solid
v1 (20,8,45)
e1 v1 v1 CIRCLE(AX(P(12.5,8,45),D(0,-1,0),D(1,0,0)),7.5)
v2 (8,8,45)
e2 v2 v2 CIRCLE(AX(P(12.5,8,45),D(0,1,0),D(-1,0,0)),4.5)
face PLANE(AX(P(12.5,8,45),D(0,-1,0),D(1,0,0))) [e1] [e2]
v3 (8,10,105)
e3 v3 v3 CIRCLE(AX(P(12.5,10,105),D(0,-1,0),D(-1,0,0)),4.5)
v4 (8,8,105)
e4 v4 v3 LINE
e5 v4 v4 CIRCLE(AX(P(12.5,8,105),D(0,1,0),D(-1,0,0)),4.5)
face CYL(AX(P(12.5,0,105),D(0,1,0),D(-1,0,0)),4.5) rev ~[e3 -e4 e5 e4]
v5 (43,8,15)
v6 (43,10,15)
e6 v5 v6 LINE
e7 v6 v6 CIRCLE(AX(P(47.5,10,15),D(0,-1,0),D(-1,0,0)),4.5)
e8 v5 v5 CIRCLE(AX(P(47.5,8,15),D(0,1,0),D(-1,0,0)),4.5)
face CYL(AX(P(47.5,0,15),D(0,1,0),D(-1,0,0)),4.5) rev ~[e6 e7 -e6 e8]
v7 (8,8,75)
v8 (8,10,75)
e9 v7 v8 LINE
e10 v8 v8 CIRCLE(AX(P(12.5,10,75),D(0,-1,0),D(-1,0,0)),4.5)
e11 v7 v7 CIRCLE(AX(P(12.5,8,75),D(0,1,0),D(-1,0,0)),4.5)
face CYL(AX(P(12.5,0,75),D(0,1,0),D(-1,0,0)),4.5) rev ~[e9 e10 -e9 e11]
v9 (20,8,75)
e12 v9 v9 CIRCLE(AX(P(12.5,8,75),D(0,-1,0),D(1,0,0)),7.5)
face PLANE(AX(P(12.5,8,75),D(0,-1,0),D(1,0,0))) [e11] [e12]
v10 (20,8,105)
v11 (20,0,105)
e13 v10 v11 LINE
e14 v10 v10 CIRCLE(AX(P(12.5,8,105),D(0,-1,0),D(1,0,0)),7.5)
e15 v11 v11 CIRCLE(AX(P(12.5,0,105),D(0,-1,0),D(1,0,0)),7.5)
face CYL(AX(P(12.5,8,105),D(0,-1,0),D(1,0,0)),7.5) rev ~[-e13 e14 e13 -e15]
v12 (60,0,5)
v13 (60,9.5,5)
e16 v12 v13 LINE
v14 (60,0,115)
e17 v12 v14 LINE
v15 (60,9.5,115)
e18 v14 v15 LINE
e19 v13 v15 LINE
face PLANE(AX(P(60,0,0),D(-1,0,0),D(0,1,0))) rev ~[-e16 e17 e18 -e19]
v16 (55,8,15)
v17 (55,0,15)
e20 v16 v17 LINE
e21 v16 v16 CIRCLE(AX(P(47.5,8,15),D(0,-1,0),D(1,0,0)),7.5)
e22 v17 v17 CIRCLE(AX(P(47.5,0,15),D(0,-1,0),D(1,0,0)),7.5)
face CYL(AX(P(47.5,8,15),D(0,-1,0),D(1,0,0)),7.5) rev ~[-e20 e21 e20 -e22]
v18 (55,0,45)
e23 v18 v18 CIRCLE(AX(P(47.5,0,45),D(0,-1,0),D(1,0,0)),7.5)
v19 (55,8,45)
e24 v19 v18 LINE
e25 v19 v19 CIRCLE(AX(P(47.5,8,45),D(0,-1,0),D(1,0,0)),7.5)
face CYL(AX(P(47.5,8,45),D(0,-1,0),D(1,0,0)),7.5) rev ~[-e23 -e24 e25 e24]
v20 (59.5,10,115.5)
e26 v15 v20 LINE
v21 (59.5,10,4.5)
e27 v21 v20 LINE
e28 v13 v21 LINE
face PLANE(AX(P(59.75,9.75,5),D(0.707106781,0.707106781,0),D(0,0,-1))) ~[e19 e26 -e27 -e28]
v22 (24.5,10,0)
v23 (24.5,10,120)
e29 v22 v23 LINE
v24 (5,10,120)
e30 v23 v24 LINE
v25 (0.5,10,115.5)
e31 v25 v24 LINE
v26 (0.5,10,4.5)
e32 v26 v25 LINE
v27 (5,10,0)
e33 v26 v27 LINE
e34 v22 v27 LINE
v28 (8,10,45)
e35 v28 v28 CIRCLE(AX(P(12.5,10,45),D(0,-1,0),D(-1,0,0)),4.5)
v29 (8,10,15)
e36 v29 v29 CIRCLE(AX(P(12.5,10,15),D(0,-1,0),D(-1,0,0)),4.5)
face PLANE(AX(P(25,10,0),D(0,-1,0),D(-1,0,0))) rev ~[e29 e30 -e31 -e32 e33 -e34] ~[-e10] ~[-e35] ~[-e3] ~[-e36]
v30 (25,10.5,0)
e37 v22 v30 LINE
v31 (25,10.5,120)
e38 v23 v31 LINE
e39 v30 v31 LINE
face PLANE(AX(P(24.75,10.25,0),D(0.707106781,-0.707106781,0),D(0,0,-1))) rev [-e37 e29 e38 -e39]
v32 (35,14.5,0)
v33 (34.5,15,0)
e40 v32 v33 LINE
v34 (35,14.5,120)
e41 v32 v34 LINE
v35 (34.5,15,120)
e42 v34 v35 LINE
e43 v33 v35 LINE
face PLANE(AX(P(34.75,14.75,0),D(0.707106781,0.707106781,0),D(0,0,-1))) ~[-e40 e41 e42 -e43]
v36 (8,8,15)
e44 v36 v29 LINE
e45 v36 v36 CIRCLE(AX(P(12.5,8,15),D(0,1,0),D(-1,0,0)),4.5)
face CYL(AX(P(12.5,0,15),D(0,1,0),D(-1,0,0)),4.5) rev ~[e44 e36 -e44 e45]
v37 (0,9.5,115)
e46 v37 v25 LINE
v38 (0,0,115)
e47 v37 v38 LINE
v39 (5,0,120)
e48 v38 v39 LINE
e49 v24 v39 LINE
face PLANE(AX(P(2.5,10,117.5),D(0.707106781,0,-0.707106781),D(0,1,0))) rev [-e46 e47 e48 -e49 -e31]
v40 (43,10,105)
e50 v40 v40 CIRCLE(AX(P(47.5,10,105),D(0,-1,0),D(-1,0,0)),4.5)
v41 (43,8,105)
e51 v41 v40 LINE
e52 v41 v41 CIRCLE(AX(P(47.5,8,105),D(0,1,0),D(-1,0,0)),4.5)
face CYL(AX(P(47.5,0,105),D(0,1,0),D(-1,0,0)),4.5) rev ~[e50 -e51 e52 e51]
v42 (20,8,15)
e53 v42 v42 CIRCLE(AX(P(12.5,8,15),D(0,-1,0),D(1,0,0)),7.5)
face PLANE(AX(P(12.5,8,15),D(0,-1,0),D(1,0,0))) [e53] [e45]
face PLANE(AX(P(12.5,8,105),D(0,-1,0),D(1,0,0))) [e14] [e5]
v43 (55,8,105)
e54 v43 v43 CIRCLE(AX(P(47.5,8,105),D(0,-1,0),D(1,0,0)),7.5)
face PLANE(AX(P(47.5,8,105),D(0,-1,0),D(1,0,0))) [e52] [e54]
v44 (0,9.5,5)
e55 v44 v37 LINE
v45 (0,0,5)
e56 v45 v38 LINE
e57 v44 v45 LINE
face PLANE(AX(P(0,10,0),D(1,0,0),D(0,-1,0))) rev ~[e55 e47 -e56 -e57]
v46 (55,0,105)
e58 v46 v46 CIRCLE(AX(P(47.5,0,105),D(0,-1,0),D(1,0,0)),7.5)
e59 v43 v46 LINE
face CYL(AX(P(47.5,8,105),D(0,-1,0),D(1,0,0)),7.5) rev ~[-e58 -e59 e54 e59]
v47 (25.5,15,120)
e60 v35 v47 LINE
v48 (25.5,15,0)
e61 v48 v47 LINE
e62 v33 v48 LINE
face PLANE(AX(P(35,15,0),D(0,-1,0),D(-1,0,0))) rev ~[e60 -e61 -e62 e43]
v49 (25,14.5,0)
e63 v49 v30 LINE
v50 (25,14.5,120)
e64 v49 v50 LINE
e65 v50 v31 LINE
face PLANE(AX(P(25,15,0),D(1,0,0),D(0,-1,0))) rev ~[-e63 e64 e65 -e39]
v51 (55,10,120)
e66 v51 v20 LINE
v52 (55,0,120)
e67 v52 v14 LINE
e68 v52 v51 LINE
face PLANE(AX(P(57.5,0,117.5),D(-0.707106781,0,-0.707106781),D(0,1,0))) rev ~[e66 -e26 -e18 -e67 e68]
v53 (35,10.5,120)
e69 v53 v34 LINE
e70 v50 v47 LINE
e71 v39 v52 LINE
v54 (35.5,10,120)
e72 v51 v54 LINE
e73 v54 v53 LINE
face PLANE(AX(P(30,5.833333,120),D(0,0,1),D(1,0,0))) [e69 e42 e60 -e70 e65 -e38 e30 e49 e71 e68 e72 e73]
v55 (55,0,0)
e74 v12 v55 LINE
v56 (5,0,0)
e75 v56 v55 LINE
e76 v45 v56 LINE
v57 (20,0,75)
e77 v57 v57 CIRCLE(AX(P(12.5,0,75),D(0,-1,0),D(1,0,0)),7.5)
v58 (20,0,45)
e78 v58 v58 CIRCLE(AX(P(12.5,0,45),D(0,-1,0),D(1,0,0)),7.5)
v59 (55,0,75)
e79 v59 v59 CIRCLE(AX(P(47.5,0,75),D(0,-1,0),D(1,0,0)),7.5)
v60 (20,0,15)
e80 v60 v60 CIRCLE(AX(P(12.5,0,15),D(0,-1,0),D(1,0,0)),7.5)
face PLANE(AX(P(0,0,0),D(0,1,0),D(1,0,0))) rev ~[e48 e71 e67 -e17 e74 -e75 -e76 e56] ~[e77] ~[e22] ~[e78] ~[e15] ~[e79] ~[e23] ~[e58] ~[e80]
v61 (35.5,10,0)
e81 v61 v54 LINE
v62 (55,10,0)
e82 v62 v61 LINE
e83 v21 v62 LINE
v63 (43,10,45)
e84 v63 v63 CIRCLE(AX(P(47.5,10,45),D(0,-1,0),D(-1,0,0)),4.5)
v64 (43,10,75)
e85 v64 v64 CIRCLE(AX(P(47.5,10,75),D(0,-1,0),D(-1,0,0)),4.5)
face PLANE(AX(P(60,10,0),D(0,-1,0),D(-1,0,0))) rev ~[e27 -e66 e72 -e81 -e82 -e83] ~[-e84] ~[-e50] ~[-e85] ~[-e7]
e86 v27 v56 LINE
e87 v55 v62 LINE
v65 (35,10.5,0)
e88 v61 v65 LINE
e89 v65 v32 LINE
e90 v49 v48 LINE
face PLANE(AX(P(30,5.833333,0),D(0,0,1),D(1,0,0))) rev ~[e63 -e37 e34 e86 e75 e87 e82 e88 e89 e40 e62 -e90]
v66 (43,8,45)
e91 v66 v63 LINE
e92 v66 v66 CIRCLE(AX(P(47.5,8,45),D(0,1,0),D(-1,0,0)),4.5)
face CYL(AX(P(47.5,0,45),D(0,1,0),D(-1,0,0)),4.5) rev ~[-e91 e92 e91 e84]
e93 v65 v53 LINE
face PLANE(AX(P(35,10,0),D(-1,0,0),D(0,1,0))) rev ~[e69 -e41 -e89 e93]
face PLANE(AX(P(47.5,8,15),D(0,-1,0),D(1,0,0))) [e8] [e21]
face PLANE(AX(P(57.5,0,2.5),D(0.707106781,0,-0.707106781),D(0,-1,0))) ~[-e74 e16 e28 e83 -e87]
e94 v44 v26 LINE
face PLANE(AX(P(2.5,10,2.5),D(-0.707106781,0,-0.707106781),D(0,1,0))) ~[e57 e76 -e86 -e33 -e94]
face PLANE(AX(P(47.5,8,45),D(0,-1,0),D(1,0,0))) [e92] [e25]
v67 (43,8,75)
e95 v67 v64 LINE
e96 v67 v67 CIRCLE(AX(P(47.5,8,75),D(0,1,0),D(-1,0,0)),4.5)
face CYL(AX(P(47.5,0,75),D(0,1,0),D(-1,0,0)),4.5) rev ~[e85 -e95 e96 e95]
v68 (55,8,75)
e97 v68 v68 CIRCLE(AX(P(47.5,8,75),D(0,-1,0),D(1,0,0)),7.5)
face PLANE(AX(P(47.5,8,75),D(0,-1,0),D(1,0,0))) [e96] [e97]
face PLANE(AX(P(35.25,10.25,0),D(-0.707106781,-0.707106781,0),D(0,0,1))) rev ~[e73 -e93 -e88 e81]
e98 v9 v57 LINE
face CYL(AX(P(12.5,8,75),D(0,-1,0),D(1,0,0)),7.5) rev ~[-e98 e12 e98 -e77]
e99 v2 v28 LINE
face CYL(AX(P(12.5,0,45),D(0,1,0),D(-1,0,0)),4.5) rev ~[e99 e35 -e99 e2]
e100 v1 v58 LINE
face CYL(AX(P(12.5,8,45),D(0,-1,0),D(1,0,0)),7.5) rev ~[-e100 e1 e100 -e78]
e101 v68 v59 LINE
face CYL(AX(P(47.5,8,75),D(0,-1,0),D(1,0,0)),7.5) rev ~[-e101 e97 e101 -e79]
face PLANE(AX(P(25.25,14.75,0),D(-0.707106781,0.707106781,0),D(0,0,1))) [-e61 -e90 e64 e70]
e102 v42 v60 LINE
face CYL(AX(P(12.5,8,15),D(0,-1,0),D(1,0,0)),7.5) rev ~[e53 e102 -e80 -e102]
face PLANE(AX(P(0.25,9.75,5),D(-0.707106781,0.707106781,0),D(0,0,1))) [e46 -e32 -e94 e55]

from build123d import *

# Parameters (mm, degrees)
F1_DEPTH       = 120
F3_D           = 9
F3_DEPTH       = 10
F3_CBORE_D     = 15
F3_CBORE_DEPTH = 8
F3_TIP         = 2.7038727856
F4_SIZE        = 5
F5_SIZE        = 0.5


with BuildPart() as f1:
    # F0 (on Top) → F1 (new body)
    with BuildSketch(Plane.XY):
        Polygon((0, 10), (0, 0), (60, 0), (60, 10), (35, 10), (35, 15), (25, 15), (25, 10), align=None)
    extrude(amount=F1_DEPTH)

    # F3
    with Locations(Plane.XZ):
        with Locations((47.5, 45), (47.5, 75), (12.5, 15), (12.5, 105), (47.5, 15), (12.5, 75), (47.5, 105), (12.5, 45)):
            CounterBoreHole(F3_D / 2, F3_CBORE_D / 2, F3_CBORE_DEPTH, depth=F3_DEPTH)
            with Locations((0, 0, -(F3_DEPTH + F3_TIP / 2))):  # 118° drill point
                Cone(0, F3_D / 2, F3_TIP, mode=Mode.SUBTRACT)

    # F4
    f4_edges = [f1.edges().sort_by_distance(p)[0] for p in [
        (0, 5, 120),
        (60, 5, 120),
        (60, 5, 0),
        (0, 5, 0),
    ]]
    chamfer(f4_edges, length=F4_SIZE)

    # F5
    f5_edges = [f1.edges().sort_by_distance(p)[0] for p in [
        (35, 15, 60),
        (25, 15, 60),
        (0, 10, 60),
        (60, 10, 60),
        (35, 10, 60),
        (25, 10, 60),
    ]]
    chamfer(f5_edges, length=F5_SIZE)


solid = f1.part
